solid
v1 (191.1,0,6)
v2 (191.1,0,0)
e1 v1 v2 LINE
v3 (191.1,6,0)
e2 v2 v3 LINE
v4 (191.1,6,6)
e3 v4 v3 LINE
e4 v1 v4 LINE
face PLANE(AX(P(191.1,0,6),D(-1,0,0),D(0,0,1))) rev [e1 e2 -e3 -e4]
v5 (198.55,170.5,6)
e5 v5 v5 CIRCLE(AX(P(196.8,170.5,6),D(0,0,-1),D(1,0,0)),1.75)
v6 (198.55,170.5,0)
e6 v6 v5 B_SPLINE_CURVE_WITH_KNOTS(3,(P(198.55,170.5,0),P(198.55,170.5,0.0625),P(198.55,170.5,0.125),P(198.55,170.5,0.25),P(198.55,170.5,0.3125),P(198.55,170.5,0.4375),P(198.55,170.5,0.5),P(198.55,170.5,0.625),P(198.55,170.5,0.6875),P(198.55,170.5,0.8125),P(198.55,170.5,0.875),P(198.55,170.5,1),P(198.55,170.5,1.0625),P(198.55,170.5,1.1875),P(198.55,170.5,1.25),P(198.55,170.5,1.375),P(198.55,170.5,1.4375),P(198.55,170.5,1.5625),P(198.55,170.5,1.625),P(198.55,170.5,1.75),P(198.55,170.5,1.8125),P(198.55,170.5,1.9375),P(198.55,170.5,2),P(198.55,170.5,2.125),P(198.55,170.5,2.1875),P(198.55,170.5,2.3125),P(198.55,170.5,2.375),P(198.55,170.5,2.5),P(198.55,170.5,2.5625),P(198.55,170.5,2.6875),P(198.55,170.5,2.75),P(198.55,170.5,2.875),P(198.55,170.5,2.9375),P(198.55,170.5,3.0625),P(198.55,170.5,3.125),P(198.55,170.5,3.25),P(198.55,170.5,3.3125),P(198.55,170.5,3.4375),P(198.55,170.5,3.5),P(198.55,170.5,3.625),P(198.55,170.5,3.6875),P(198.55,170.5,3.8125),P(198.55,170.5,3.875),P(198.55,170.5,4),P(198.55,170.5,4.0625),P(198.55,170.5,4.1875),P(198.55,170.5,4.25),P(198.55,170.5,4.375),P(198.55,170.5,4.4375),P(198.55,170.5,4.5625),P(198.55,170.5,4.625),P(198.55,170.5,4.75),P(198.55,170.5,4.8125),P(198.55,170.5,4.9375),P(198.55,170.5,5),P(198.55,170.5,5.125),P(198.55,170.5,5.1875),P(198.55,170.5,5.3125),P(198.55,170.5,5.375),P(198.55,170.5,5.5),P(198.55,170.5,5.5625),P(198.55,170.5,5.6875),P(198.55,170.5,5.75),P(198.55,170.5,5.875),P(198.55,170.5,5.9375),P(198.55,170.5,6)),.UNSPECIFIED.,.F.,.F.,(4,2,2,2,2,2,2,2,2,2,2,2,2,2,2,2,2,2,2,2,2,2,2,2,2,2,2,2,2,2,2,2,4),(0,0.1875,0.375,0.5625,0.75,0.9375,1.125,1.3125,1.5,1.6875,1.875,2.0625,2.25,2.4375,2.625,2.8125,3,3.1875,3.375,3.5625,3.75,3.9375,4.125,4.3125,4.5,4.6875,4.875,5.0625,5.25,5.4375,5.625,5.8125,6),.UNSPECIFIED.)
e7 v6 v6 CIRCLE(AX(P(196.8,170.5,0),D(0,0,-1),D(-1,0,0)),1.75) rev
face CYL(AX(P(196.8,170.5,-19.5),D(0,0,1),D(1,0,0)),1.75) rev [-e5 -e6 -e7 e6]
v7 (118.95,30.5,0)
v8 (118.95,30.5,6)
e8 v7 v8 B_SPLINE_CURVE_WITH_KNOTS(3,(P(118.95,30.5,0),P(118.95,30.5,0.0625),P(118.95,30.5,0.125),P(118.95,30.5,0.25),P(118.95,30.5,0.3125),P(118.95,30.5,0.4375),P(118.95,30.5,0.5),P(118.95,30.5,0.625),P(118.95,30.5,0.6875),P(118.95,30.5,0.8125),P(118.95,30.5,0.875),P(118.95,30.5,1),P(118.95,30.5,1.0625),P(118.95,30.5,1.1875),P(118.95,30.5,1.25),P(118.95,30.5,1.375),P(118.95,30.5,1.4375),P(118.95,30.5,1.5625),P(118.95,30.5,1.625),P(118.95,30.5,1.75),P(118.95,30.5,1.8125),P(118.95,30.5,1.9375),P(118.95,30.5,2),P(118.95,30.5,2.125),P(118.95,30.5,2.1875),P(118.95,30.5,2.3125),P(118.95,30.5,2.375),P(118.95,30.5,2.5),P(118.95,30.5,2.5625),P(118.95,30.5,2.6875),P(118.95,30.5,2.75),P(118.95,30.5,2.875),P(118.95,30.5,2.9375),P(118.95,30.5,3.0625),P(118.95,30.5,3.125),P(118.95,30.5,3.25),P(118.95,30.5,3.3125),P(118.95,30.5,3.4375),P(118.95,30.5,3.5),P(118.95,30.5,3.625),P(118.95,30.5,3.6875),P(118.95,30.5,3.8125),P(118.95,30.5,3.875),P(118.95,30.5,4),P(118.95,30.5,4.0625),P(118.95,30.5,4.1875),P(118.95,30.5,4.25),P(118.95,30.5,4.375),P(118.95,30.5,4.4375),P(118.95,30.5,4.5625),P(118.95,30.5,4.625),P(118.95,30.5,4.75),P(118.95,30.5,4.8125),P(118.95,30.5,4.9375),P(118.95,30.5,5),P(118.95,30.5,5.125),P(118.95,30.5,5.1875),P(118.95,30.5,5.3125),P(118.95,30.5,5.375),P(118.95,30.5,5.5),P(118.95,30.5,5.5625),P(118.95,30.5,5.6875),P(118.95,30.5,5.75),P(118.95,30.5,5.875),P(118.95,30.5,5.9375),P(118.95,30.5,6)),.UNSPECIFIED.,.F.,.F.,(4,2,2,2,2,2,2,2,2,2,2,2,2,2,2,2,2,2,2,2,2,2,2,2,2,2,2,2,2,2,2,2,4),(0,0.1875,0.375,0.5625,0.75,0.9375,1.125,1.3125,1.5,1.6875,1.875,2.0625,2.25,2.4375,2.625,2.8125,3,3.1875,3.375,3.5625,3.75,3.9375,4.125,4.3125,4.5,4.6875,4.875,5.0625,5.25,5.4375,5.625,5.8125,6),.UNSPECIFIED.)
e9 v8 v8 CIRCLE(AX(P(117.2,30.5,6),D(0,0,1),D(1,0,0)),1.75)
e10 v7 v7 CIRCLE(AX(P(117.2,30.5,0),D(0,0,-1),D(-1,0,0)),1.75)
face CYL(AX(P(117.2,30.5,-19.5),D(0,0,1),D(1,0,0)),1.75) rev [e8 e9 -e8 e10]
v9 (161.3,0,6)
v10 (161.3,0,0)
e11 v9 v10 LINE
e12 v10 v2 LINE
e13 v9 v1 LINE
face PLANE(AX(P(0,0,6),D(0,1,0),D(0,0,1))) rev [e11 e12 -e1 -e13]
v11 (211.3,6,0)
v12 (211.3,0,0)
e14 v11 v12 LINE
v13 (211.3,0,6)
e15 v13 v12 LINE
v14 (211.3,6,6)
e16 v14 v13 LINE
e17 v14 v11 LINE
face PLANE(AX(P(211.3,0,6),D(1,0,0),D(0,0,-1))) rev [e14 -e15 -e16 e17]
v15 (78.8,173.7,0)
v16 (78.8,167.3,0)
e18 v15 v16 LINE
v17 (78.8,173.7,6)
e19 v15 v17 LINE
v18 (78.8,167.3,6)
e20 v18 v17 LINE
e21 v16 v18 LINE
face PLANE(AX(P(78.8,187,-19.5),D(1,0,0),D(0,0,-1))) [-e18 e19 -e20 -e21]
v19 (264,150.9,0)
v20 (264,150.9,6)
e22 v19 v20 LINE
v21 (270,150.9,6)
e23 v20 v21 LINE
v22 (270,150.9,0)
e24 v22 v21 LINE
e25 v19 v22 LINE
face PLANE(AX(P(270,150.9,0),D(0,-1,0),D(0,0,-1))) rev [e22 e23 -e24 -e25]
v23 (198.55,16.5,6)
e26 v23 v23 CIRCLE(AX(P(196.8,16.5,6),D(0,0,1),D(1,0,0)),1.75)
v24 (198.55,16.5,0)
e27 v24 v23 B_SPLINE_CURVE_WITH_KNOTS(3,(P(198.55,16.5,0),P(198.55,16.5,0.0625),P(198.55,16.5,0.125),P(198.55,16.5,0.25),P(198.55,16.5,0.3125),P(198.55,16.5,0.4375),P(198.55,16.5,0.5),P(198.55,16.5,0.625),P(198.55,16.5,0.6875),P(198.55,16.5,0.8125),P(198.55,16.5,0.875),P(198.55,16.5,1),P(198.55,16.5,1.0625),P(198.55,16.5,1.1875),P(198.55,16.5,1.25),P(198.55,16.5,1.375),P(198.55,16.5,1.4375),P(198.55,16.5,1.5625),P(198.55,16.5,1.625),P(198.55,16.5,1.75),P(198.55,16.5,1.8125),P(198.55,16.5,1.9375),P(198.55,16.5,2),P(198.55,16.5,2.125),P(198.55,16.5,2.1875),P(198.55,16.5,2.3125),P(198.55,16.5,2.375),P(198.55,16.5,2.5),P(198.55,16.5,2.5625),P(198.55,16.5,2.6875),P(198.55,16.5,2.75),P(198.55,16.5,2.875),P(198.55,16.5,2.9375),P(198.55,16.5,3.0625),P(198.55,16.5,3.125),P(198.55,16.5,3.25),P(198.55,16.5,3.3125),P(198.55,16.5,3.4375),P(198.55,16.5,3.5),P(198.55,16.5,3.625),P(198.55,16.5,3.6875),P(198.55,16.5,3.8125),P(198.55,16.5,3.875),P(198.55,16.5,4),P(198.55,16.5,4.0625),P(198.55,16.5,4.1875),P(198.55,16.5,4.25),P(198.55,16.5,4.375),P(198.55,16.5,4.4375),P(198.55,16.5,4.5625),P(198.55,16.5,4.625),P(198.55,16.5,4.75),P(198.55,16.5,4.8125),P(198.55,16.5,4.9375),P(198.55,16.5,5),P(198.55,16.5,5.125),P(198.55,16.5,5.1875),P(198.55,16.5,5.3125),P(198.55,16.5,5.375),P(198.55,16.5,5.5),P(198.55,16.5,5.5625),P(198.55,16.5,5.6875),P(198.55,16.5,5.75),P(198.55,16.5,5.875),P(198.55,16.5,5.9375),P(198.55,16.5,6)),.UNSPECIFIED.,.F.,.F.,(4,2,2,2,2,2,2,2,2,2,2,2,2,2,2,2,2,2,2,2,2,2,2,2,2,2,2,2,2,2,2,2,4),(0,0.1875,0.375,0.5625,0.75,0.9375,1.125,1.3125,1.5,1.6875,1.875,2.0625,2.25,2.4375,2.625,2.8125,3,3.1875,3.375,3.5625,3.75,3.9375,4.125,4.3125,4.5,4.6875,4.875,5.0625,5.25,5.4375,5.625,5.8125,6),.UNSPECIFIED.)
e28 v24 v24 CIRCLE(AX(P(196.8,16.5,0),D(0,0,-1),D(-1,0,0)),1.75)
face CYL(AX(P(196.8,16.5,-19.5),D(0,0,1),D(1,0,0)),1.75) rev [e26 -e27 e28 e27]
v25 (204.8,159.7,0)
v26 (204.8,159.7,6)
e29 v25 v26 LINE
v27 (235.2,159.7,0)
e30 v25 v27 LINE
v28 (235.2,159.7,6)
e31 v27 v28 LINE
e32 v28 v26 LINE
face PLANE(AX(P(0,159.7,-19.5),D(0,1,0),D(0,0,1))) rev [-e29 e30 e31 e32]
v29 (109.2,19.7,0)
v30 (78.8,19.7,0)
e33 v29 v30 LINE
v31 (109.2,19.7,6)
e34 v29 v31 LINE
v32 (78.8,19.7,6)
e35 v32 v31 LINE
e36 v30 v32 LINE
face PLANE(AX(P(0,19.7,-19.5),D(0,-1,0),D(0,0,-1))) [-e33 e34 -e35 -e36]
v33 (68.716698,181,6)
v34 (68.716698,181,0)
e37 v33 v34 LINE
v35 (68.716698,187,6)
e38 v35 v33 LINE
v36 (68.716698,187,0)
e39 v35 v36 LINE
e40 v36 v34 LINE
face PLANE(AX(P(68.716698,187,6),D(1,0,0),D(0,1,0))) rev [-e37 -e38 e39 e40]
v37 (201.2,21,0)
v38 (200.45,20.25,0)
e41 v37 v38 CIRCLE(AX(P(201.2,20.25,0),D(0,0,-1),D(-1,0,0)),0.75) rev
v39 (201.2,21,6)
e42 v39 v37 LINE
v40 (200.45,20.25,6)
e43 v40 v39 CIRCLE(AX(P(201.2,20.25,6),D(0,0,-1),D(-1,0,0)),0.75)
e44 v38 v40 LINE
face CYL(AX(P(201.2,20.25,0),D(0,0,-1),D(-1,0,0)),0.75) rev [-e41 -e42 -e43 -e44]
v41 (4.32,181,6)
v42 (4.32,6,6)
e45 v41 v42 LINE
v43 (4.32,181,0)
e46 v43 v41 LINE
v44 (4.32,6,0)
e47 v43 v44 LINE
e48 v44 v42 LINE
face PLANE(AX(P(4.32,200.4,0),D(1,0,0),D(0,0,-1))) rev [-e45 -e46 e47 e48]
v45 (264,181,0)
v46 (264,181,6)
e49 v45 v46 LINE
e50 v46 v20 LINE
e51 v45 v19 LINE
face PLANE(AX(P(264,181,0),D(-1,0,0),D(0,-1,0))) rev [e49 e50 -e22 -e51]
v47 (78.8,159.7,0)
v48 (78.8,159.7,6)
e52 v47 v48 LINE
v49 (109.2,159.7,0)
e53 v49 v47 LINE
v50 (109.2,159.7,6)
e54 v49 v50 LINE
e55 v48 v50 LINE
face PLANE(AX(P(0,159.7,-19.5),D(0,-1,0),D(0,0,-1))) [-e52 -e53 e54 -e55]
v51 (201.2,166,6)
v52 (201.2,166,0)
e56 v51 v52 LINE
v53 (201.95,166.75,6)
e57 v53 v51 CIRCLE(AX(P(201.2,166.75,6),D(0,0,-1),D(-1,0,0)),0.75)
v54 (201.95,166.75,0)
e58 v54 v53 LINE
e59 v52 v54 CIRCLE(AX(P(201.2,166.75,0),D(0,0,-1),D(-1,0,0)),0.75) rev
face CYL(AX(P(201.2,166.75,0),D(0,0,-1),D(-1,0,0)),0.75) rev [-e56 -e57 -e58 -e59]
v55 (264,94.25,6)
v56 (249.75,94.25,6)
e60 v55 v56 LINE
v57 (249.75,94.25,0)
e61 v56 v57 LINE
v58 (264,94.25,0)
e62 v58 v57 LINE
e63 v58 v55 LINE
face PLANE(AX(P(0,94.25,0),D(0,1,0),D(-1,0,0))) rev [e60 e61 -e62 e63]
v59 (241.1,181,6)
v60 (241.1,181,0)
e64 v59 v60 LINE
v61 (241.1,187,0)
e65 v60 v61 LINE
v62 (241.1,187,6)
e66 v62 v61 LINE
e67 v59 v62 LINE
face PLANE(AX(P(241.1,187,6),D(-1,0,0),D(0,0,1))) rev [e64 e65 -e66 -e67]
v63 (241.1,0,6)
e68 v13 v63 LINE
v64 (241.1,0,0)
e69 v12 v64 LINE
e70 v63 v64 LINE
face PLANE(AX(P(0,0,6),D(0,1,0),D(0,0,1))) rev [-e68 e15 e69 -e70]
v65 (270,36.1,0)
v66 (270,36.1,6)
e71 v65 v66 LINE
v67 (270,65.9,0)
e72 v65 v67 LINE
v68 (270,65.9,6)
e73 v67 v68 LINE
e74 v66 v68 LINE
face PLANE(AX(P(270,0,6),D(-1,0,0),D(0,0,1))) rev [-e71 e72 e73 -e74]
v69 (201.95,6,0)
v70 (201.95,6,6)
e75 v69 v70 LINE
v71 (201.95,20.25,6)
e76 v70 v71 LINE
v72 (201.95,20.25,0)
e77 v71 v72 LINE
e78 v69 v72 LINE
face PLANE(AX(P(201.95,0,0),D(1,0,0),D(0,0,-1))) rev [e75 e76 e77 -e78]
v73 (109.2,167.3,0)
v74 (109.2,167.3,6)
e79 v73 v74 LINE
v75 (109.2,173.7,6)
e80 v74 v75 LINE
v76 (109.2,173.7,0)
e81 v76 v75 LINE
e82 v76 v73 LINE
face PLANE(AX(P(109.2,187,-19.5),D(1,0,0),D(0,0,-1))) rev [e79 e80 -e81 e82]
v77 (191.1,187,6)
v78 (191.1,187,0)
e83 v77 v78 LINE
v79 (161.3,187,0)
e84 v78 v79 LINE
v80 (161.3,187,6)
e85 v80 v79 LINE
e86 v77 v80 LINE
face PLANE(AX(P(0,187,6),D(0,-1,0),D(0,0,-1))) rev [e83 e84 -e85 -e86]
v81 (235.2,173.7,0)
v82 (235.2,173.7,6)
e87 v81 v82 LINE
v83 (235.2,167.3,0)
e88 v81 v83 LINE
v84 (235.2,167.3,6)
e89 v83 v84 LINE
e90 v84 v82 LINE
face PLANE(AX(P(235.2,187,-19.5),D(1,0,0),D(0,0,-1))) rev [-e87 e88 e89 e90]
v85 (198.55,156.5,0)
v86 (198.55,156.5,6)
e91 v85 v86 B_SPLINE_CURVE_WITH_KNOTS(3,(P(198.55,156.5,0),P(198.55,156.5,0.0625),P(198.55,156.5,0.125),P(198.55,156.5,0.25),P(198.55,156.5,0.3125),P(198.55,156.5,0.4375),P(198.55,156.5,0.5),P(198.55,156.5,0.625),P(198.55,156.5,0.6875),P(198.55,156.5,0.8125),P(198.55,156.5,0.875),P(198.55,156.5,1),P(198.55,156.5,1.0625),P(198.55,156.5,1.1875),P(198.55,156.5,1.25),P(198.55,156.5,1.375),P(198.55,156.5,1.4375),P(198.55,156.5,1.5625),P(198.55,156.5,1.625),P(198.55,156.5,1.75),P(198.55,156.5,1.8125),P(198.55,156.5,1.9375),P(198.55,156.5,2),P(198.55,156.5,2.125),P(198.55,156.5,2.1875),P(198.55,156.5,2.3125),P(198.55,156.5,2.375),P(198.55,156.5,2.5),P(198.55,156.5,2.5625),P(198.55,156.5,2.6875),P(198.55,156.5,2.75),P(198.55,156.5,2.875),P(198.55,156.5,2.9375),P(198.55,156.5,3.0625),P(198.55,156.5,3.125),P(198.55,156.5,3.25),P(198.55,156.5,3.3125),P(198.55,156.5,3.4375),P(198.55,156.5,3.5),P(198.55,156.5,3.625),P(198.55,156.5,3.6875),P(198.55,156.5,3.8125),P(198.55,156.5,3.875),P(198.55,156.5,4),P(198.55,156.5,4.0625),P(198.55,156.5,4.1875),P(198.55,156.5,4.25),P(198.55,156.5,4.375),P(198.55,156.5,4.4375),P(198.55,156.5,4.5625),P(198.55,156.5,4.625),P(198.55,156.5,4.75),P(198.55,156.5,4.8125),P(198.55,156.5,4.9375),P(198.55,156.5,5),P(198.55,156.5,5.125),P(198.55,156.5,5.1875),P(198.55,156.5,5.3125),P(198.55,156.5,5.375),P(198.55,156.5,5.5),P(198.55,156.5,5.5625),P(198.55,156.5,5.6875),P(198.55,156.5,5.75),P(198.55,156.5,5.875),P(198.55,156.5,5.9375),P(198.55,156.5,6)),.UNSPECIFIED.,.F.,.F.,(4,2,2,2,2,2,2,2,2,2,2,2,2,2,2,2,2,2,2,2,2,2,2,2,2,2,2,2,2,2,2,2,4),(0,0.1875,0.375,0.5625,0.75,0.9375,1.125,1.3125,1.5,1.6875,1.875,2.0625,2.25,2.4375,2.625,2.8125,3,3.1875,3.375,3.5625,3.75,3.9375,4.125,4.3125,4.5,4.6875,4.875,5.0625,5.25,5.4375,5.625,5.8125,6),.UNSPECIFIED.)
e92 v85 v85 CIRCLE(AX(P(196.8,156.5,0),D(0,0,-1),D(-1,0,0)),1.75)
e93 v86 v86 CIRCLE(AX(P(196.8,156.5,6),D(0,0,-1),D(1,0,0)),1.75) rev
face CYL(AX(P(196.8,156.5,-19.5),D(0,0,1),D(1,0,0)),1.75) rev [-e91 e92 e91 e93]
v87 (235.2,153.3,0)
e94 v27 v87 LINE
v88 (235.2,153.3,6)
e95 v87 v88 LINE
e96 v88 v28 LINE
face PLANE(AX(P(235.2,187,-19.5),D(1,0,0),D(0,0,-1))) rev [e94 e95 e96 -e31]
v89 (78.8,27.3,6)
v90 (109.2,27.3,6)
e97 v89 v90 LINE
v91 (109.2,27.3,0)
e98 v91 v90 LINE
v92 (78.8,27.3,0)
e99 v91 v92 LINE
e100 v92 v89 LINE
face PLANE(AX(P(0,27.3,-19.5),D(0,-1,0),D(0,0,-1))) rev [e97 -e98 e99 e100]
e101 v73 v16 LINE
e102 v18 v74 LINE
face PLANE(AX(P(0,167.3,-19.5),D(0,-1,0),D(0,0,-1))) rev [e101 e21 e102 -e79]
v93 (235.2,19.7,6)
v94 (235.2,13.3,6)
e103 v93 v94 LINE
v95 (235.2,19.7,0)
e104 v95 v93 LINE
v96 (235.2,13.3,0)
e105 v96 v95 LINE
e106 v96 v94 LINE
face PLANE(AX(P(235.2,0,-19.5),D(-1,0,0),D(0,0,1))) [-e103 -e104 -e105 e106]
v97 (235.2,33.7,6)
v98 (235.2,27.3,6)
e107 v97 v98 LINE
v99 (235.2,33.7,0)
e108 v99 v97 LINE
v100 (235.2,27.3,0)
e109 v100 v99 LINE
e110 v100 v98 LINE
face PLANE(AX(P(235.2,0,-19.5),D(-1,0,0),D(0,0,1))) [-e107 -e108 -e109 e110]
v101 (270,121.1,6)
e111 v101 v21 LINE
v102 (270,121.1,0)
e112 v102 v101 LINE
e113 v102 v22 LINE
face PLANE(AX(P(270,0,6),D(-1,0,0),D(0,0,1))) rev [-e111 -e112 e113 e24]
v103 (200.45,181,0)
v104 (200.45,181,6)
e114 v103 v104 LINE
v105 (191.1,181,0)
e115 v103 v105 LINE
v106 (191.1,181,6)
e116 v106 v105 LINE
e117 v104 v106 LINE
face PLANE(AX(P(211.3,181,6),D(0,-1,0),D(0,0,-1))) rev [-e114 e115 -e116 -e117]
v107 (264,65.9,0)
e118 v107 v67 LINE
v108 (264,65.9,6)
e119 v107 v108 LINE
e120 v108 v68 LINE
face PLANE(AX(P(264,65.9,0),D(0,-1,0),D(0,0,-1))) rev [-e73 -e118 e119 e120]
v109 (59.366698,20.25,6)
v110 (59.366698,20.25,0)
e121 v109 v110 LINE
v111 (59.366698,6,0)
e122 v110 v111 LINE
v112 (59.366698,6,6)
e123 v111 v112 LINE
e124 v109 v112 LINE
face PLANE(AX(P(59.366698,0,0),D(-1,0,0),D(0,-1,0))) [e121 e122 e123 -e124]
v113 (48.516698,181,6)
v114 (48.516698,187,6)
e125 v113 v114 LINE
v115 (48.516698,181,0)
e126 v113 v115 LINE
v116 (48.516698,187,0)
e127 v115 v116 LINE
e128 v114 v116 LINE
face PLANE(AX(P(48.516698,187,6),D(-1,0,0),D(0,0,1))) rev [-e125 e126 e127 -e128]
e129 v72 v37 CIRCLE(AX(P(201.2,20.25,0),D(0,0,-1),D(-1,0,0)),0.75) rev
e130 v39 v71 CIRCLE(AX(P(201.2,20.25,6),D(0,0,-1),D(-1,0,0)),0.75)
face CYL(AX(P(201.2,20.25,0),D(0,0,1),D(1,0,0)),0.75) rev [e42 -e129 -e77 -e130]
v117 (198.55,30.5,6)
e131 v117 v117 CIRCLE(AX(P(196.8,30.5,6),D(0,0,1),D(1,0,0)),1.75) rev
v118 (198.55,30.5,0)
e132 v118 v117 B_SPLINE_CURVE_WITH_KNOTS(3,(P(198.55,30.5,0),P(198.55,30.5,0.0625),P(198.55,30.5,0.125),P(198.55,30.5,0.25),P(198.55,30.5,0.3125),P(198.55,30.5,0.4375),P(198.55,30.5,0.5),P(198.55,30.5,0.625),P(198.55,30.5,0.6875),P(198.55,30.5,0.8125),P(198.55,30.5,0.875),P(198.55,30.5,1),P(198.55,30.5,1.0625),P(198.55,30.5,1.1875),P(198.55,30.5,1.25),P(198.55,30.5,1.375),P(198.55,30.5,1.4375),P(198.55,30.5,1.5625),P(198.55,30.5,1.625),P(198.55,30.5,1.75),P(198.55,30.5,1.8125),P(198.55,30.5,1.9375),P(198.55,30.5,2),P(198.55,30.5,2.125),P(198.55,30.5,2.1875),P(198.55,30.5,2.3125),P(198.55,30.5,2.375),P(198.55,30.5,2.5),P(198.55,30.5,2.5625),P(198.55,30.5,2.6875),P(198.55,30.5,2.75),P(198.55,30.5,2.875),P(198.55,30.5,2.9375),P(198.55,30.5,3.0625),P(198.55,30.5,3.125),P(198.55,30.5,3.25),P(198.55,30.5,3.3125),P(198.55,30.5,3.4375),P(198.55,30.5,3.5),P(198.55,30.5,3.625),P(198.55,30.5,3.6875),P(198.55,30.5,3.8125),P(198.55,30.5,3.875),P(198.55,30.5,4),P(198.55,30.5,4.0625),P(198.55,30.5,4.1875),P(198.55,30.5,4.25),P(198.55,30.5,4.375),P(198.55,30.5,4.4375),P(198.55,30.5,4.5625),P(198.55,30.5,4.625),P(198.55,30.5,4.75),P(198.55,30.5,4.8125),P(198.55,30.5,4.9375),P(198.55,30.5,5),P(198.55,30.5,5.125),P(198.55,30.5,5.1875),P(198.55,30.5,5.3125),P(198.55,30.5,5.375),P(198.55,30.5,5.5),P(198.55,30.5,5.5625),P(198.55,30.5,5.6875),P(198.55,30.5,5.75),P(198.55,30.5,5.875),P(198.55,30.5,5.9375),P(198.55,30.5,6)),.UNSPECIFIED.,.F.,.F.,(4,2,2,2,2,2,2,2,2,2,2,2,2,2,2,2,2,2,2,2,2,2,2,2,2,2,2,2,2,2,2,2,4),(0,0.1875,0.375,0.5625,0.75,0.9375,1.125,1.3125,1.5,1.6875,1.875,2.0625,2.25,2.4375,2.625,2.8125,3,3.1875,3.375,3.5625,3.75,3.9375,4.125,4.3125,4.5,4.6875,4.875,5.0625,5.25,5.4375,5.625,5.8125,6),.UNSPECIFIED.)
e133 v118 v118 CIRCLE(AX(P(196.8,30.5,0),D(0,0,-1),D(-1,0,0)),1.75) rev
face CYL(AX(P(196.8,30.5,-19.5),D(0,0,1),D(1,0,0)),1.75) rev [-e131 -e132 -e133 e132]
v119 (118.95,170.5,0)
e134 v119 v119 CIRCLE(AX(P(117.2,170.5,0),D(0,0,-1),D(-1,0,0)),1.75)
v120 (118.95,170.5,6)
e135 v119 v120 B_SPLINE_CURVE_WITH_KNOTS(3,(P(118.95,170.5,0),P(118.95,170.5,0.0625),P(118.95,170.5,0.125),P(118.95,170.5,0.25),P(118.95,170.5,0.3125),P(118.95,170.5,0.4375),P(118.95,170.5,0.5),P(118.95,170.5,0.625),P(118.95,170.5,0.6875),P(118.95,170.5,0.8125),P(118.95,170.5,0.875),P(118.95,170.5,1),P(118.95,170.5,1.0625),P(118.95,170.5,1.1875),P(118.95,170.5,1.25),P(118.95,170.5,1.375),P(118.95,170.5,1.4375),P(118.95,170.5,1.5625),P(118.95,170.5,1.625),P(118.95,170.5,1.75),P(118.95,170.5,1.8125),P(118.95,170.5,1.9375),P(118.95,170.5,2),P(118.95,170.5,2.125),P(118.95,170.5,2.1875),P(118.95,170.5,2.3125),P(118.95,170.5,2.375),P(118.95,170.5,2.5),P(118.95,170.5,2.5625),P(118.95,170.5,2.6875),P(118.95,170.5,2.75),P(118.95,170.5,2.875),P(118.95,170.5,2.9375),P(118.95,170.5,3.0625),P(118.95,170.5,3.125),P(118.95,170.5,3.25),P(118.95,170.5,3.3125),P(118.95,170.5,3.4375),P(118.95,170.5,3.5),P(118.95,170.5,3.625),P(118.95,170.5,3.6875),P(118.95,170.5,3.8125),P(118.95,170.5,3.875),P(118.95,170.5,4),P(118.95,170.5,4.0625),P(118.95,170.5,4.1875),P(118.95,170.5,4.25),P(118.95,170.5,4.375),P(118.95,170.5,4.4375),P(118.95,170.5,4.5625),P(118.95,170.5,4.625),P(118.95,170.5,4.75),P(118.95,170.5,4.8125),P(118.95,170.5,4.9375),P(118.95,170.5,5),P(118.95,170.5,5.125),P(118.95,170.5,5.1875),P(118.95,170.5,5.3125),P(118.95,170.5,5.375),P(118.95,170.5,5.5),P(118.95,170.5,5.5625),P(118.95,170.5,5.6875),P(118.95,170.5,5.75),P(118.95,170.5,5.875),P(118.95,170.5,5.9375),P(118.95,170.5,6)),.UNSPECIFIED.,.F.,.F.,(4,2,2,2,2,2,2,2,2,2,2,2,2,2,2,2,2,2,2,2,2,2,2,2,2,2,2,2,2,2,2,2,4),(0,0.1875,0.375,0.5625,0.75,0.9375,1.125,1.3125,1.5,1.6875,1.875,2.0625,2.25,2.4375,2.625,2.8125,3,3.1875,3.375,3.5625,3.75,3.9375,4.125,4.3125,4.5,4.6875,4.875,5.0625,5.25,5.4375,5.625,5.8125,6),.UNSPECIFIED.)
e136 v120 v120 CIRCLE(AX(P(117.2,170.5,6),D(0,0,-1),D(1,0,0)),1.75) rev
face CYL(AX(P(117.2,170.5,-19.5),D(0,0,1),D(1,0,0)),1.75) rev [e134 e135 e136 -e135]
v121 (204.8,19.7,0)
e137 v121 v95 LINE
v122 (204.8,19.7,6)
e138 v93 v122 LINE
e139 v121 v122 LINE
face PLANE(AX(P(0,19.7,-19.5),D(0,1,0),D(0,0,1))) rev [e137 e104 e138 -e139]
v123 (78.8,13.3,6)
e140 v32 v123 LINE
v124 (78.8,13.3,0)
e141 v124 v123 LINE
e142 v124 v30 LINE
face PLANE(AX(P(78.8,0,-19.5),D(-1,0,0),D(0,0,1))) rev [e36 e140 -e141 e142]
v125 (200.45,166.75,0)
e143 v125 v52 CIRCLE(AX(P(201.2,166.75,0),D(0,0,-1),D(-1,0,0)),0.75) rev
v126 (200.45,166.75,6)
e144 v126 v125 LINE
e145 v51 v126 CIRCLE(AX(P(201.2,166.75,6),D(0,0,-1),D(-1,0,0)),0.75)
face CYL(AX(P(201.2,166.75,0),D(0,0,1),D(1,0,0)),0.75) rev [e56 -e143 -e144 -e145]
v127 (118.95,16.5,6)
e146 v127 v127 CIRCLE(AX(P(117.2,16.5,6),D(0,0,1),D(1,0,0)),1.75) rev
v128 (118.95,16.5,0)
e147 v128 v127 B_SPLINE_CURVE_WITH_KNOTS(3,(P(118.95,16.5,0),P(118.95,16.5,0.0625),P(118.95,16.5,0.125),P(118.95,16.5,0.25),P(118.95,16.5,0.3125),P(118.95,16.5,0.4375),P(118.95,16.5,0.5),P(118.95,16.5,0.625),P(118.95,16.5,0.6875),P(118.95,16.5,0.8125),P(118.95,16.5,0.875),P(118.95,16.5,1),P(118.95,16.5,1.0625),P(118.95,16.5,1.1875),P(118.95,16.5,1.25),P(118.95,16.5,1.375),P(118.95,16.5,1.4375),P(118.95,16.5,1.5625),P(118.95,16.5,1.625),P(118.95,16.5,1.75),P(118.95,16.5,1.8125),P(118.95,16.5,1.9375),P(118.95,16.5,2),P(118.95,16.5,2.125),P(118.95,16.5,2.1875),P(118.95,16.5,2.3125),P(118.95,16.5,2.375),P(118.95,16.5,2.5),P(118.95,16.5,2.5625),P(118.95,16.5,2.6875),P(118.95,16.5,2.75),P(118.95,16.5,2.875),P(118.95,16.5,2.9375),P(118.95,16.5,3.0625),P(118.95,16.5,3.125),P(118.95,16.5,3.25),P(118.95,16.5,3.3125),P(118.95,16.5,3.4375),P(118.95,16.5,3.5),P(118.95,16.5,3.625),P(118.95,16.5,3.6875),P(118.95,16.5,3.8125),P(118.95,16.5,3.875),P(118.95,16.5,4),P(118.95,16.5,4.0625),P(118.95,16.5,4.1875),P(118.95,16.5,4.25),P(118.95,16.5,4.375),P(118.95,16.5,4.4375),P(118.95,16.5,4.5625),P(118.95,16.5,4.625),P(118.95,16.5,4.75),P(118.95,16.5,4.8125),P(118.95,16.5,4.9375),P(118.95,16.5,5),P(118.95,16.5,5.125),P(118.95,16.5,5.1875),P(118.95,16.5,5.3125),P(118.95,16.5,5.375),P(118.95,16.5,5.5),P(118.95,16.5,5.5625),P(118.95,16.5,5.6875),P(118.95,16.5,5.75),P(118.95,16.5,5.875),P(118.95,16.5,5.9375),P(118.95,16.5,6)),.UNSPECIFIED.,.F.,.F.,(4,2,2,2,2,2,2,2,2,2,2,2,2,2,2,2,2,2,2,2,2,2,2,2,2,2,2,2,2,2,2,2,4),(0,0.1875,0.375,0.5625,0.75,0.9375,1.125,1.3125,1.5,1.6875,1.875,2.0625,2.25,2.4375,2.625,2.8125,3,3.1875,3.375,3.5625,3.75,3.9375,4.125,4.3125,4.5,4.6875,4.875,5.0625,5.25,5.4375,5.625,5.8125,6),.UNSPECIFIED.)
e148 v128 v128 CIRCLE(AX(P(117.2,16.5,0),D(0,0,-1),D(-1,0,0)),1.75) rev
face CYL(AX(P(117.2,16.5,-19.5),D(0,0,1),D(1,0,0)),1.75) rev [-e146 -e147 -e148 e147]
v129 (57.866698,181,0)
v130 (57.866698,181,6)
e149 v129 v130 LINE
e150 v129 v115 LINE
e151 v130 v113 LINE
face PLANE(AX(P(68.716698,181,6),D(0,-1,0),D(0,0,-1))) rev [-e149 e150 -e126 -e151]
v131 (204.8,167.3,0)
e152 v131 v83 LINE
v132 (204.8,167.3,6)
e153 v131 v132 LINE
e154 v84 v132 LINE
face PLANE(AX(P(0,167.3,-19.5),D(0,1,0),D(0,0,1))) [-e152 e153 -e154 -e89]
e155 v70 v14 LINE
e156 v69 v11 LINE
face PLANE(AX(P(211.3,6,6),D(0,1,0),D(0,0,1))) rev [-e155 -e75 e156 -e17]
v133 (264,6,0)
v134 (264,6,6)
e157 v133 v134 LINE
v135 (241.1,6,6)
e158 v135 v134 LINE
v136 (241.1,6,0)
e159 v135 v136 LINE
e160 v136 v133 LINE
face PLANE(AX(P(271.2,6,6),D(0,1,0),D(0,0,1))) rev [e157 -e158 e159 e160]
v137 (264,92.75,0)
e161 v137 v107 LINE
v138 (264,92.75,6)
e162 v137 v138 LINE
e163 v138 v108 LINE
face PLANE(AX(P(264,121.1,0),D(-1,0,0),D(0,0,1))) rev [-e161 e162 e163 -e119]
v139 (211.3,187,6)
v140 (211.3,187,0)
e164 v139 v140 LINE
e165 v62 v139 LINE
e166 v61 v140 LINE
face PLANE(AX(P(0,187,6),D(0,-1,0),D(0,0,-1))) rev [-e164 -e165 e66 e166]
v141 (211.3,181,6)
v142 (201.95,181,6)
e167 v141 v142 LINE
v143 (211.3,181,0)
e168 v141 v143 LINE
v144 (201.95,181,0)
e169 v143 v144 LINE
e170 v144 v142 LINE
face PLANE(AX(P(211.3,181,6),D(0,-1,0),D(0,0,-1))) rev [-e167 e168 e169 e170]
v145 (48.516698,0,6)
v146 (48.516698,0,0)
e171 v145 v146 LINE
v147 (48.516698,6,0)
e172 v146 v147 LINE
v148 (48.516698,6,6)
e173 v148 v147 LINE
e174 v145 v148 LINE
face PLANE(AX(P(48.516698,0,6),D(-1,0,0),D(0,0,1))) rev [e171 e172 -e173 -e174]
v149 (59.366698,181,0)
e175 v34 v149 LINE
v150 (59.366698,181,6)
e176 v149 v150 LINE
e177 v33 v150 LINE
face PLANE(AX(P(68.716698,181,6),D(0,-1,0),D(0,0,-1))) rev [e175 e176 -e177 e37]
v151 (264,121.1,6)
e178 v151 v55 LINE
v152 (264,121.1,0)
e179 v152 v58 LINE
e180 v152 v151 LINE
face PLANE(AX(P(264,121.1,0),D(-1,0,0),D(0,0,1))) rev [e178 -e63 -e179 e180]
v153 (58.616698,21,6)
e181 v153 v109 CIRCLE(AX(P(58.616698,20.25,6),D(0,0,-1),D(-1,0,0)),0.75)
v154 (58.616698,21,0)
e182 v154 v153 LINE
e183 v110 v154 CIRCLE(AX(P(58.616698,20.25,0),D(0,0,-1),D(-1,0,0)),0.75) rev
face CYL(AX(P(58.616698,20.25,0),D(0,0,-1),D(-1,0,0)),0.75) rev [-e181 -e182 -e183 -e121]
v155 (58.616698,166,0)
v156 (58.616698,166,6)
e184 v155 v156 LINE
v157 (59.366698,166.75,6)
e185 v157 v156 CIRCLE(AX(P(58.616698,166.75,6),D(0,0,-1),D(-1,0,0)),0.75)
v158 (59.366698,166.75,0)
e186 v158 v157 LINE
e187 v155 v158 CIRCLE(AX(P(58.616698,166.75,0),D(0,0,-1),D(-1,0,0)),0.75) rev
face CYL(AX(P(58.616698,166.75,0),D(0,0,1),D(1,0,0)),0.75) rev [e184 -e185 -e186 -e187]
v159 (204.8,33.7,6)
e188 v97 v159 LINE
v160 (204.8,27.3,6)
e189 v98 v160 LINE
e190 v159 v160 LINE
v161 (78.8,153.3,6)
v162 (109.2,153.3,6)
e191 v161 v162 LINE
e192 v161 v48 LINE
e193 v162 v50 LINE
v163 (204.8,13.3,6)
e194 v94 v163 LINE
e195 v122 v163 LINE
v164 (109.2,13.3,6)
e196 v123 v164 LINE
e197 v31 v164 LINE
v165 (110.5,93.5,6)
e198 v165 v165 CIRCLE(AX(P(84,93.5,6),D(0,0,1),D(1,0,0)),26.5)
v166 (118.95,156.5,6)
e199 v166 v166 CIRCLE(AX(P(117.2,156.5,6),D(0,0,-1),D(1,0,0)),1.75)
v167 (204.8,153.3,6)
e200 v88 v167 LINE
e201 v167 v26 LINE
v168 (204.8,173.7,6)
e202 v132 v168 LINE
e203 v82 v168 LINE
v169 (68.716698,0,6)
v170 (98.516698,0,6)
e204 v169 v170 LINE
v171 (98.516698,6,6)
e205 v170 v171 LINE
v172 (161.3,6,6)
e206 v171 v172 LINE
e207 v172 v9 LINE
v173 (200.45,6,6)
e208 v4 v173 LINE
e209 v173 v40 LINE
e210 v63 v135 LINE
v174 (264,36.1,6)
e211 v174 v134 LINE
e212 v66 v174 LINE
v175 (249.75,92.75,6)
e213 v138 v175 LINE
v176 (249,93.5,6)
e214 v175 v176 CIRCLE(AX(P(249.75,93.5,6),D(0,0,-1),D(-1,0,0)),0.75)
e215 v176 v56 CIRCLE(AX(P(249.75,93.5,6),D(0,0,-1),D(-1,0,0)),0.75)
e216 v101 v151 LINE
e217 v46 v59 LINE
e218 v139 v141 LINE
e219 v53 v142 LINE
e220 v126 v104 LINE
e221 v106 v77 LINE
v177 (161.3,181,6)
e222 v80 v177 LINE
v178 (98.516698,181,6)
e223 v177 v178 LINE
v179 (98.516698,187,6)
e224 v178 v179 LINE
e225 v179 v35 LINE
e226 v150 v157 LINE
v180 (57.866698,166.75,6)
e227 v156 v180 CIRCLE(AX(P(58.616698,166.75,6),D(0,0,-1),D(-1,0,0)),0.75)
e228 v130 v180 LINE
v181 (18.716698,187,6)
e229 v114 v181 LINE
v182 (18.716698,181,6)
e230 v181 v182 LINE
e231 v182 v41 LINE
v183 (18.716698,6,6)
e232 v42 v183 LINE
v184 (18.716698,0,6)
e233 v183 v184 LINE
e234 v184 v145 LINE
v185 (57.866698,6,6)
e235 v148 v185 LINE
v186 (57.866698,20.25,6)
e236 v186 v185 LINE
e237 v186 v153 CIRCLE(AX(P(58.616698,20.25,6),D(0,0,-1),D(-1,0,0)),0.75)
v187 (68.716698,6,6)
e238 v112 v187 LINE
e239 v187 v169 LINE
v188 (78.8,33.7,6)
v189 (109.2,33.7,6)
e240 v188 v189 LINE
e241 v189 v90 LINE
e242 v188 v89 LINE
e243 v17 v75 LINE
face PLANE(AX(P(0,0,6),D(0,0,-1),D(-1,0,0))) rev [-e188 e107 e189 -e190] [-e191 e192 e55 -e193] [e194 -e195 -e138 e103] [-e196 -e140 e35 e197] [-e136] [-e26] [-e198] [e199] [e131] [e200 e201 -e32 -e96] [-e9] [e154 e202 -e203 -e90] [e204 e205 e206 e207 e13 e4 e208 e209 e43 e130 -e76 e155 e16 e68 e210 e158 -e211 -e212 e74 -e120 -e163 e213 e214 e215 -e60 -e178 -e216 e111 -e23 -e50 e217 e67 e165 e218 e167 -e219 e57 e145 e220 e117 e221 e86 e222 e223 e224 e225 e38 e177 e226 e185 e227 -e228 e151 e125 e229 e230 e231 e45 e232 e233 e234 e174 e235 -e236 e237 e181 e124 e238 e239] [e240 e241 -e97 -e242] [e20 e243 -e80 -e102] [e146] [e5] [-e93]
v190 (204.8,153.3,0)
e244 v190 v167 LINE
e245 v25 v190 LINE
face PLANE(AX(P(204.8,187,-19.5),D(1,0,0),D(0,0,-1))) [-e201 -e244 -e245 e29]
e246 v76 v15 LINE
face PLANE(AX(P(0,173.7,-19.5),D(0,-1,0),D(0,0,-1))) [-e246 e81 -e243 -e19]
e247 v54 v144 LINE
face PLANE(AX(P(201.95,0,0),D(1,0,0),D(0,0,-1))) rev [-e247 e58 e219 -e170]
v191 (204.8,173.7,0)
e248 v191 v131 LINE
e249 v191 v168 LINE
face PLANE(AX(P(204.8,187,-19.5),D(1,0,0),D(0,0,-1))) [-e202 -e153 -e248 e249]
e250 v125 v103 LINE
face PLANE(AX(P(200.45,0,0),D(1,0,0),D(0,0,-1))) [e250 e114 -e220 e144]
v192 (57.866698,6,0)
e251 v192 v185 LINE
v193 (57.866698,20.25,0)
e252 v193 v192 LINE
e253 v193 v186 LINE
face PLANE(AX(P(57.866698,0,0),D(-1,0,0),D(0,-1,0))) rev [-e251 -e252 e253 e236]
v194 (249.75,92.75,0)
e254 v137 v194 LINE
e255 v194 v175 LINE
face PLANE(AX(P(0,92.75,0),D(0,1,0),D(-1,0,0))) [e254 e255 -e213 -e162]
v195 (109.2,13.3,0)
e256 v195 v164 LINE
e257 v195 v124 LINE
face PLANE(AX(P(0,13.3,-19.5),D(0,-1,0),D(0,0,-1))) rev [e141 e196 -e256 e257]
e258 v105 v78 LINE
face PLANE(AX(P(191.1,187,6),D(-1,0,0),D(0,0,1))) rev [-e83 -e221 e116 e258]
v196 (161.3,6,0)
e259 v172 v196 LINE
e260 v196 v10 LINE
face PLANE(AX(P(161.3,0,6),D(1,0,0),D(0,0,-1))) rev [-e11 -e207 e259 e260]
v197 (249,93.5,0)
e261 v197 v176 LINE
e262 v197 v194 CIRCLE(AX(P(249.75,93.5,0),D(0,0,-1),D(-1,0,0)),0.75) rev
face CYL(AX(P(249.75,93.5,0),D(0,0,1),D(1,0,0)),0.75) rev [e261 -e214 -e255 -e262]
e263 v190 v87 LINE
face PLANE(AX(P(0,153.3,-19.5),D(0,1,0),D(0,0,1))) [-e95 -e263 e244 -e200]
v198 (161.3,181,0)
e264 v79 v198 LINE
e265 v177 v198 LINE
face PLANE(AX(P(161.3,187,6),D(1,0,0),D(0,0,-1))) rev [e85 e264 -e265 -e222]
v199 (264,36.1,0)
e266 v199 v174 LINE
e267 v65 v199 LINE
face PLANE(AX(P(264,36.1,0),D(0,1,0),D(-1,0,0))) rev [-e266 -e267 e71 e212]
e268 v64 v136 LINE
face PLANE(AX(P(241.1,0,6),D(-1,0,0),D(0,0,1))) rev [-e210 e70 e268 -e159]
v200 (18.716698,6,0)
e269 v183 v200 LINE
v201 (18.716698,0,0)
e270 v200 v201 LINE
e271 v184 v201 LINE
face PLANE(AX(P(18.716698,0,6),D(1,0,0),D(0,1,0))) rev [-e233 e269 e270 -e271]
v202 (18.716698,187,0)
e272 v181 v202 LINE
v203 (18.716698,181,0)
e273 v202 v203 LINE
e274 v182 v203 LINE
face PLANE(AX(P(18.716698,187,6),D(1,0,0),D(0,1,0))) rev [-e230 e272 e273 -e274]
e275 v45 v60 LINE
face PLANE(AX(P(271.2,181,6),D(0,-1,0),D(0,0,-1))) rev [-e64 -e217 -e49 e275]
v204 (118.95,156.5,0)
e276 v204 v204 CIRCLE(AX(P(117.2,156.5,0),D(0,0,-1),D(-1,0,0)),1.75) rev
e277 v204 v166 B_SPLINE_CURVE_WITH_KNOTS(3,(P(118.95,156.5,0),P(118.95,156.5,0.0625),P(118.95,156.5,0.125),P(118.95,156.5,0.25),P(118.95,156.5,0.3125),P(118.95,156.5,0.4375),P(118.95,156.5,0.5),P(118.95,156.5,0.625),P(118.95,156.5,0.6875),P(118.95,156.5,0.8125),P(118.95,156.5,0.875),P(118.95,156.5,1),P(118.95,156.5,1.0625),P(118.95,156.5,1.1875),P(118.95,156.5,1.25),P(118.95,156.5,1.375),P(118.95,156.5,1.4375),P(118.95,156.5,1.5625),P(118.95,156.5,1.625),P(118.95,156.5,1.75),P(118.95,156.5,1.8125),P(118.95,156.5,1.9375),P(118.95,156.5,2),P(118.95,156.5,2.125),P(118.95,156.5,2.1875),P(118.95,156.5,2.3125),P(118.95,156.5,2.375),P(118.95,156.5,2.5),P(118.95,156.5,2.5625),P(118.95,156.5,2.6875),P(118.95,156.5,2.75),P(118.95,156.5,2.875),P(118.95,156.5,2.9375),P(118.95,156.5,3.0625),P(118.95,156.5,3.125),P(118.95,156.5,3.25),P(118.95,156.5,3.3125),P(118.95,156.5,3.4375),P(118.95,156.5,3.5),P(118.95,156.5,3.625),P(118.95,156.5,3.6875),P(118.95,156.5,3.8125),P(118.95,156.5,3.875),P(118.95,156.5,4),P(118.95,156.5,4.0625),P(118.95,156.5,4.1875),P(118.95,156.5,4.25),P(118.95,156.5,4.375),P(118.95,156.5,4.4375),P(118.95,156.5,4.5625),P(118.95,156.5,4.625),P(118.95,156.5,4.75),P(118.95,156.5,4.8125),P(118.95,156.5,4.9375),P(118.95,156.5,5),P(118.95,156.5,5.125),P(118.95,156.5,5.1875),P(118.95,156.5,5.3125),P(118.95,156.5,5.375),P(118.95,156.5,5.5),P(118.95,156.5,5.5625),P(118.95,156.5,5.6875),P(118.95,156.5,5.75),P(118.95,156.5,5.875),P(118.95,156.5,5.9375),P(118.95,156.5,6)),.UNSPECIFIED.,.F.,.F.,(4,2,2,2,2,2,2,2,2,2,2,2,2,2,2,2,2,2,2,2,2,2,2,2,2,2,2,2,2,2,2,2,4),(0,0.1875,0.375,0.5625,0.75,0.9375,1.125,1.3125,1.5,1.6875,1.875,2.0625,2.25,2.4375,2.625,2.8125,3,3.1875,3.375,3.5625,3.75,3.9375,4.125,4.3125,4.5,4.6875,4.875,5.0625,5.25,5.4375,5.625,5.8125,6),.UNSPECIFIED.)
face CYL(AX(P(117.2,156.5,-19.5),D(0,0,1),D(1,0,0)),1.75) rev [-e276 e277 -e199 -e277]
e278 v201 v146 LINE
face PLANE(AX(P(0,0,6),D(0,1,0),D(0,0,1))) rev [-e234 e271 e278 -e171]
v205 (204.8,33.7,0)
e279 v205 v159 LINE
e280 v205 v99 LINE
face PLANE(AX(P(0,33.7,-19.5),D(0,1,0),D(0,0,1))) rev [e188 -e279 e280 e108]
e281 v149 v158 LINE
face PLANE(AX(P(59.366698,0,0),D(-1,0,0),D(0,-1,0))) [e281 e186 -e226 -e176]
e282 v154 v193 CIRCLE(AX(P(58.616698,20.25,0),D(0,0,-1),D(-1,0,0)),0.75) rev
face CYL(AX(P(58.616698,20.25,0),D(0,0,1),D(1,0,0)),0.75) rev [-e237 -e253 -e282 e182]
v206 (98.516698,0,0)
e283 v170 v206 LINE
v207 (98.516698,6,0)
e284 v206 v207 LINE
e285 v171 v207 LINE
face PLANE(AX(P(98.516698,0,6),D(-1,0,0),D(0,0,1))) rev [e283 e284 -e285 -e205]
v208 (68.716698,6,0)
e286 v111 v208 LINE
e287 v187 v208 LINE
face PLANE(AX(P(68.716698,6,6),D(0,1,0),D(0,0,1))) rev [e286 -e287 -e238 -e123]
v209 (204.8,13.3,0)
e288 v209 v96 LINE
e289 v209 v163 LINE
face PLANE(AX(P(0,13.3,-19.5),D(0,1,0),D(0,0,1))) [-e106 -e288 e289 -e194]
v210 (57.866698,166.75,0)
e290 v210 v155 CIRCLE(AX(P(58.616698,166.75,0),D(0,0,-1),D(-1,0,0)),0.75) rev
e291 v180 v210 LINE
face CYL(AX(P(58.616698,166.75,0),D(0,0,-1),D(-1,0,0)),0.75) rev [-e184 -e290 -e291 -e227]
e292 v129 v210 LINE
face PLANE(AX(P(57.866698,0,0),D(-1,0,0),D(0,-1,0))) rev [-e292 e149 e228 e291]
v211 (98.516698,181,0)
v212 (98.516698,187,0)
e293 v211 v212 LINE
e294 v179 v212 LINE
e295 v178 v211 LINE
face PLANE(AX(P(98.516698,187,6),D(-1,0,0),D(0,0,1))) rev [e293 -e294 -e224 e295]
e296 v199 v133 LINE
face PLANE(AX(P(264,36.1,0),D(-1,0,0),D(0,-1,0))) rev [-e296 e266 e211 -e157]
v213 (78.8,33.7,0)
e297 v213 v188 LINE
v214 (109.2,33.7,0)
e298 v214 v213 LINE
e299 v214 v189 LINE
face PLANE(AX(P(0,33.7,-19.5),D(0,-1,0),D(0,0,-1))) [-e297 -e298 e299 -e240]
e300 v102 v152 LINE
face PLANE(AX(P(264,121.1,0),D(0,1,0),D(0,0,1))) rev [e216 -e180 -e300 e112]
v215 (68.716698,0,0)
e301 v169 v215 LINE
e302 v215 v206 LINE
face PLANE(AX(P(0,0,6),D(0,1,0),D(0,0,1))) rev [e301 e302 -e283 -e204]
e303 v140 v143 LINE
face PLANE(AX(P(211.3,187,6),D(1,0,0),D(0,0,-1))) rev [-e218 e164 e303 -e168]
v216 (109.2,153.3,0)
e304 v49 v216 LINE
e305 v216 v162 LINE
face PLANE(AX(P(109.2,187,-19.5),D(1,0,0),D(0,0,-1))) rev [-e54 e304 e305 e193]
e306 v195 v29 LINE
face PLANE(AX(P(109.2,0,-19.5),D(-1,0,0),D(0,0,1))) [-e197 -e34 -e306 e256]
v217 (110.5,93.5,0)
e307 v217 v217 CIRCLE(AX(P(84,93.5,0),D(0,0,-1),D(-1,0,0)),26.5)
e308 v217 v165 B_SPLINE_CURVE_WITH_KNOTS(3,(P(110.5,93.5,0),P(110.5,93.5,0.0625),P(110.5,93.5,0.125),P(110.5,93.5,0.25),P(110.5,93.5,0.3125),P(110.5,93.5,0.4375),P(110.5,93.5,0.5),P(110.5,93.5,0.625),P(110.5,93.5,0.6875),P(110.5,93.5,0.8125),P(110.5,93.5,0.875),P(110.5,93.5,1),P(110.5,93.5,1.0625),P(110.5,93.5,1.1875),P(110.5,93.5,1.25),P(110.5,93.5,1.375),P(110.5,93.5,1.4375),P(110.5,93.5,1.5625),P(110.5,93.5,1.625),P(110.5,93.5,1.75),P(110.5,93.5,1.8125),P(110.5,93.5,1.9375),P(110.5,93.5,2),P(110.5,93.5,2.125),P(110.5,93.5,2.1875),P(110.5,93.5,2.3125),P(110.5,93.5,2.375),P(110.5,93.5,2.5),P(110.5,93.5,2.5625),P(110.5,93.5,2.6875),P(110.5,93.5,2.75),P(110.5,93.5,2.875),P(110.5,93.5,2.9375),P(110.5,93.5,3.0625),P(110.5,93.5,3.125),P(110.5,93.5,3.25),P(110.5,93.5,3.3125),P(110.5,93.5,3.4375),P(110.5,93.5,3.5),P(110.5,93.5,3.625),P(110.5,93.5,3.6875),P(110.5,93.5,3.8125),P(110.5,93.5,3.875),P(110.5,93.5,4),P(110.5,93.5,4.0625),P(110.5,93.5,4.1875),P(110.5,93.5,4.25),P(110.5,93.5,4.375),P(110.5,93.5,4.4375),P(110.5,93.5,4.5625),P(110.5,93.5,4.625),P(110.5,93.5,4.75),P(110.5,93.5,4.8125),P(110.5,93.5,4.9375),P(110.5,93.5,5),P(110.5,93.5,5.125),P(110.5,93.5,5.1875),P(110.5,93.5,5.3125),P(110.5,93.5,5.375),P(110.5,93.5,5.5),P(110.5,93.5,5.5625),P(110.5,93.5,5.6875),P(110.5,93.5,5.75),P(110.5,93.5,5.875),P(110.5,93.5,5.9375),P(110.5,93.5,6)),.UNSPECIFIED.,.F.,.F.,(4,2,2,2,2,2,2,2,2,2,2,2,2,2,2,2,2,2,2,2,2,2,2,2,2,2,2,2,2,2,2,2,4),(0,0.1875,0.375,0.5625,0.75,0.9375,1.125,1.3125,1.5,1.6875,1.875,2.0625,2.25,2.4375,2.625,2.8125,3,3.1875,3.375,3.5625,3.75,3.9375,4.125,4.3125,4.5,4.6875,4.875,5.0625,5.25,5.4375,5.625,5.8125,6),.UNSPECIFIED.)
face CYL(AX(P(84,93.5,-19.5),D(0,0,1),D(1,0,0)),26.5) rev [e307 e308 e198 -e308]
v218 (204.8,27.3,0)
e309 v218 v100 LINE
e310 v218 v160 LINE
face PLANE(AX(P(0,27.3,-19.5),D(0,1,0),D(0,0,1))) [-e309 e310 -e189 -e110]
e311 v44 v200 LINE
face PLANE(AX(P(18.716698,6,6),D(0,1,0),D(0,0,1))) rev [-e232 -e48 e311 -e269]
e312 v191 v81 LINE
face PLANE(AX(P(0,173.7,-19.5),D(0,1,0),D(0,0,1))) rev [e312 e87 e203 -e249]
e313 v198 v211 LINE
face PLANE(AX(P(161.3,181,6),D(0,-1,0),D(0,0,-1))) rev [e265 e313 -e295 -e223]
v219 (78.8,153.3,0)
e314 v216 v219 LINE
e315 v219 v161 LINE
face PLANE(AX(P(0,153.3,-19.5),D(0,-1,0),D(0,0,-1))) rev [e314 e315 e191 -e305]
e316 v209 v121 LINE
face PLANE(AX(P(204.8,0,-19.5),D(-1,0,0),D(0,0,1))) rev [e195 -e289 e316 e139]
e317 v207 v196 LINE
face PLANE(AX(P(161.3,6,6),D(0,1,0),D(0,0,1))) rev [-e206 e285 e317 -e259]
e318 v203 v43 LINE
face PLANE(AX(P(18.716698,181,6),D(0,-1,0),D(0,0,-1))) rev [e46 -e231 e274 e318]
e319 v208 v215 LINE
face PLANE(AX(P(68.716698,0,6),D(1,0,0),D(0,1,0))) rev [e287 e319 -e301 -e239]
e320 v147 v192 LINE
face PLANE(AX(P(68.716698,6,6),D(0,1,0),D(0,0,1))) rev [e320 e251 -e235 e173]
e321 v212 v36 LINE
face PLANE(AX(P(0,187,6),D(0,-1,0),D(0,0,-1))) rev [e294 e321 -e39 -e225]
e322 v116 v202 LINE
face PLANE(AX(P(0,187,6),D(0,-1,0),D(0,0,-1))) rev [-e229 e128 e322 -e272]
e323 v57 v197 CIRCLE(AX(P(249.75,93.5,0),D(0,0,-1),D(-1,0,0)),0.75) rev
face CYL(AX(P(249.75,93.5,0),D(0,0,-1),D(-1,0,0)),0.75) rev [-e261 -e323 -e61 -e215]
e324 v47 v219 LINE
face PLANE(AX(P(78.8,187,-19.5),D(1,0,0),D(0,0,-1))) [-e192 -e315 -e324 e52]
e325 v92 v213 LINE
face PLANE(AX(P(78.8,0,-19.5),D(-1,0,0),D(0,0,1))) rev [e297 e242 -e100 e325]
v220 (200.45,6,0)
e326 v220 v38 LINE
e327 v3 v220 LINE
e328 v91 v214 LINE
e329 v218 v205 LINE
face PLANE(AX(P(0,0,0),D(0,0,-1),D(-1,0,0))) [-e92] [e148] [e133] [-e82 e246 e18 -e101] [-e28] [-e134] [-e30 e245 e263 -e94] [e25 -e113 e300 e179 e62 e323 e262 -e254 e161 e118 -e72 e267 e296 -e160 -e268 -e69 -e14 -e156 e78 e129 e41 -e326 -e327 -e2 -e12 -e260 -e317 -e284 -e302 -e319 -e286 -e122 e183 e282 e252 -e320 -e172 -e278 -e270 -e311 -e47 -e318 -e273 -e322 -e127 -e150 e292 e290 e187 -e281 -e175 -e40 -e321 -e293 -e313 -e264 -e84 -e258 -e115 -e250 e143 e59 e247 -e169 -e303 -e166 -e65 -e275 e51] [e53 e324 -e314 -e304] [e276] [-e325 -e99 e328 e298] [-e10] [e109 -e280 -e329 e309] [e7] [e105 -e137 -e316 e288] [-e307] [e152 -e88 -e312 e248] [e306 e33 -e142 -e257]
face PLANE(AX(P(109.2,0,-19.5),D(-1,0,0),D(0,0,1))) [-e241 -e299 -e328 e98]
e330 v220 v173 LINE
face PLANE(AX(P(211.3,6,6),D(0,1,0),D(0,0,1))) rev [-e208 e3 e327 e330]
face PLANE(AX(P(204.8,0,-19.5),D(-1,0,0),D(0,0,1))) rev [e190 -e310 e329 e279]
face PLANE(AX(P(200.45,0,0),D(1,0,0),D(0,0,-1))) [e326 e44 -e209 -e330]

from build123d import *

# Parameters (mm, degrees)
ESBO_O1_W                = 270
ESBO_O1_H                = 187
RESSALTO_EXTRUS_O1_DEPTH = 6
ESBO_O2_W                = 30.1
ESBO_O2_H                = 6
ESBO_O2_W_2              = 20.2
ESBO_O2_W_3              = 62.783302492
ESBO_O2_W_4              = 18.716697508
CORTE_EXTRUS_O1_DEPTH    = 6
ESBO_O3_W                = 6
ESBO_O3_H                = 30.1
ESBO_O3_H_2              = 55.2
CORTE_EXTRUS_O2_DEPTH    = 6
ESBO_O4_W                = 0.75
ESBO_O4_H                = 15
ESBO_O4_W_2              = 1.5
ESBO_O4_W_3              = 15
ESBO_O4_H_2              = 1.5
CORTE_EXTRUS_O3_DEPTH    = 6
ESBO_O7_W                = 4.32
ESBO_O7_H                = 6
CORTE_EXTRUS_O4_DEPTH    = 194.4
ESBO_O8_W                = 30.4
ESBO_O8_H                = 6.4
ESBO_O8_R                = 1.75
CORTE_EXTRUS_O5_DEPTH    = 25.5
ESBO_O10_R               = 26.5
CORTE_EXTRUS_O6_DEPTH    = 25.5
FILETE1_R                = 0.75


with BuildPart() as part:
    # Esboço1 → Ressalto-extrusão1 (new body)
    with BuildSketch(Plane.XY):
        with Locations((135, 93.5)):
            Rectangle(ESBO_O1_W, ESBO_O1_H)
    extrude(amount=RESSALTO_EXTRUS_O1_DEPTH)

    # Esboço2 → Corte-extrusão1 (cut)
    with BuildSketch(Plane(origin=(0, 0, 0), x_dir=(-1, 0, 0), z_dir=(0, 0, -1))):
        with Locations((-256.15, 184)):
            Rectangle(ESBO_O2_W, ESBO_O2_H)
        with Locations((-201.2, 184)):
            Rectangle(ESBO_O2_W_2, ESBO_O2_H)
        with Locations((-129.908348754, 184)):
            Rectangle(ESBO_O2_W_3, ESBO_O2_H)
        with Locations((-58.616697508, 184)):
            Rectangle(ESBO_O2_W_2, ESBO_O2_H)
        with Locations((-9.358348754, 184)):
            Rectangle(ESBO_O2_W_4, ESBO_O2_H)
        with Locations((-9.358348754, 3)):
            Rectangle(ESBO_O2_W_4, ESBO_O2_H)
        with Locations((-58.616697508, 3)):
            Rectangle(ESBO_O2_W_2, ESBO_O2_H)
        with Locations((-129.908348754, 3)):
            Rectangle(ESBO_O2_W_3, ESBO_O2_H)
        with Locations((-201.2, 3)):
            Rectangle(ESBO_O2_W_2, ESBO_O2_H)
        with Locations((-256.15, 3)):
            Rectangle(ESBO_O2_W, ESBO_O2_H)
    extrude(amount=-CORTE_EXTRUS_O1_DEPTH, mode=Mode.SUBTRACT)

    # Esboço3 → Corte-extrusão2 (cut)
    with BuildSketch(Plane.XY.offset(6)):
        with Locations((267, 165.95)):
            Rectangle(ESBO_O3_W, ESBO_O3_H)
        with Locations((267, 93.5)):
            Rectangle(ESBO_O3_W, ESBO_O3_H_2)
        with Locations((267, 21.05)):
            Rectangle(ESBO_O3_W, ESBO_O3_H)
    extrude(amount=-CORTE_EXTRUS_O2_DEPTH, mode=Mode.SUBTRACT)

    # Esboço4 → Corte-extrusão3 (cut)
    with BuildSketch(Plane.XY.offset(6)):
        with Locations((58.241697508, 173.5)):
            Rectangle(ESBO_O4_W, ESBO_O4_H)
        with Locations((58.991697508, 173.5)):
            Rectangle(ESBO_O4_W, ESBO_O4_H)
        with Locations((58.241697508, 13.5)):
            Rectangle(ESBO_O4_W, ESBO_O4_H)
        with Locations((58.991697508, 13.5)):
            Rectangle(ESBO_O4_W, ESBO_O4_H)
        with Locations((201.2, 13.5)):
            Rectangle(ESBO_O4_W_2, ESBO_O4_H)
        with Locations((256.5, 93.5)):
            Rectangle(ESBO_O4_W_3, ESBO_O4_H_2)
        with Locations((201.2, 173.5)):
            Rectangle(ESBO_O4_W_2, ESBO_O4_H)
    extrude(amount=-CORTE_EXTRUS_O3_DEPTH, mode=Mode.SUBTRACT)

    # Esboço7 → Corte-extrusão4 (cut)
    with BuildSketch(Plane(origin=(0, 6, 0), x_dir=(1, 0, 0), z_dir=(0, 1, 0))):
        with Locations((2.16, -3)):
            Rectangle(ESBO_O7_W, ESBO_O7_H)
    extrude(amount=CORTE_EXTRUS_O4_DEPTH, mode=Mode.SUBTRACT)

    # Esboço8 → Corte-extrusão5 (cut)
    with BuildSketch(Plane.XY.offset(6)):
        with Locations((94, 30.5)):
            Rectangle(ESBO_O8_W, ESBO_O8_H)
        with Locations((94, 16.5)):
            Rectangle(ESBO_O8_W, ESBO_O8_H)
        with Locations((220, 16.5)):
            Rectangle(ESBO_O8_W, ESBO_O8_H)
        with Locations((220, 30.5)):
            Rectangle(ESBO_O8_W, ESBO_O8_H)
        with Locations((117.2, 30.5)):
            Circle(ESBO_O8_R)
        with Locations((117.2, 16.5)):
            Circle(ESBO_O8_R)
        with Locations((196.8, 30.5)):
            Circle(ESBO_O8_R)
        with Locations((196.8, 16.5)):
            Circle(ESBO_O8_R)
    corte_extrus_o5 = extrude(amount=-CORTE_EXTRUS_O5_DEPTH, mode=Mode.SUBTRACT)

    # Espelhar1: Corte-extrusão5 across plane
    add(corte_extrus_o5.mirror(Plane(origin=(0, 93.5, 0), x_dir=(0, 0, 1), z_dir=(0, -1, 0))), mode=Mode.SUBTRACT)

    # Esboço10 → Corte-extrusão6 (cut)
    with BuildSketch(Plane.XY.offset(6)):
        with Locations((84, 93.5)):
            Circle(ESBO_O10_R)
    extrude(amount=-CORTE_EXTRUS_O6_DEPTH, mode=Mode.SUBTRACT)

    # Filete1
    filete1_edges = [part.edges().sort_by_distance(p)[0] for p in [
        (59.366697508, 166, 3),
        (57.866697508, 166, 3),
        (200.45, 166, 3),
        (201.95, 166, 3),
        (249, 92.75, 3),
        (249, 94.25, 3),
        (201.95, 21, 3),
        (200.45, 21, 3),
        (57.866697508, 21, 3),
        (59.366697508, 21, 3),
    ]]
    fillet(filete1_edges, radius=FILETE1_R - 0.0001)  # a hair under: the kernel refuses the full size


solid = part.part
